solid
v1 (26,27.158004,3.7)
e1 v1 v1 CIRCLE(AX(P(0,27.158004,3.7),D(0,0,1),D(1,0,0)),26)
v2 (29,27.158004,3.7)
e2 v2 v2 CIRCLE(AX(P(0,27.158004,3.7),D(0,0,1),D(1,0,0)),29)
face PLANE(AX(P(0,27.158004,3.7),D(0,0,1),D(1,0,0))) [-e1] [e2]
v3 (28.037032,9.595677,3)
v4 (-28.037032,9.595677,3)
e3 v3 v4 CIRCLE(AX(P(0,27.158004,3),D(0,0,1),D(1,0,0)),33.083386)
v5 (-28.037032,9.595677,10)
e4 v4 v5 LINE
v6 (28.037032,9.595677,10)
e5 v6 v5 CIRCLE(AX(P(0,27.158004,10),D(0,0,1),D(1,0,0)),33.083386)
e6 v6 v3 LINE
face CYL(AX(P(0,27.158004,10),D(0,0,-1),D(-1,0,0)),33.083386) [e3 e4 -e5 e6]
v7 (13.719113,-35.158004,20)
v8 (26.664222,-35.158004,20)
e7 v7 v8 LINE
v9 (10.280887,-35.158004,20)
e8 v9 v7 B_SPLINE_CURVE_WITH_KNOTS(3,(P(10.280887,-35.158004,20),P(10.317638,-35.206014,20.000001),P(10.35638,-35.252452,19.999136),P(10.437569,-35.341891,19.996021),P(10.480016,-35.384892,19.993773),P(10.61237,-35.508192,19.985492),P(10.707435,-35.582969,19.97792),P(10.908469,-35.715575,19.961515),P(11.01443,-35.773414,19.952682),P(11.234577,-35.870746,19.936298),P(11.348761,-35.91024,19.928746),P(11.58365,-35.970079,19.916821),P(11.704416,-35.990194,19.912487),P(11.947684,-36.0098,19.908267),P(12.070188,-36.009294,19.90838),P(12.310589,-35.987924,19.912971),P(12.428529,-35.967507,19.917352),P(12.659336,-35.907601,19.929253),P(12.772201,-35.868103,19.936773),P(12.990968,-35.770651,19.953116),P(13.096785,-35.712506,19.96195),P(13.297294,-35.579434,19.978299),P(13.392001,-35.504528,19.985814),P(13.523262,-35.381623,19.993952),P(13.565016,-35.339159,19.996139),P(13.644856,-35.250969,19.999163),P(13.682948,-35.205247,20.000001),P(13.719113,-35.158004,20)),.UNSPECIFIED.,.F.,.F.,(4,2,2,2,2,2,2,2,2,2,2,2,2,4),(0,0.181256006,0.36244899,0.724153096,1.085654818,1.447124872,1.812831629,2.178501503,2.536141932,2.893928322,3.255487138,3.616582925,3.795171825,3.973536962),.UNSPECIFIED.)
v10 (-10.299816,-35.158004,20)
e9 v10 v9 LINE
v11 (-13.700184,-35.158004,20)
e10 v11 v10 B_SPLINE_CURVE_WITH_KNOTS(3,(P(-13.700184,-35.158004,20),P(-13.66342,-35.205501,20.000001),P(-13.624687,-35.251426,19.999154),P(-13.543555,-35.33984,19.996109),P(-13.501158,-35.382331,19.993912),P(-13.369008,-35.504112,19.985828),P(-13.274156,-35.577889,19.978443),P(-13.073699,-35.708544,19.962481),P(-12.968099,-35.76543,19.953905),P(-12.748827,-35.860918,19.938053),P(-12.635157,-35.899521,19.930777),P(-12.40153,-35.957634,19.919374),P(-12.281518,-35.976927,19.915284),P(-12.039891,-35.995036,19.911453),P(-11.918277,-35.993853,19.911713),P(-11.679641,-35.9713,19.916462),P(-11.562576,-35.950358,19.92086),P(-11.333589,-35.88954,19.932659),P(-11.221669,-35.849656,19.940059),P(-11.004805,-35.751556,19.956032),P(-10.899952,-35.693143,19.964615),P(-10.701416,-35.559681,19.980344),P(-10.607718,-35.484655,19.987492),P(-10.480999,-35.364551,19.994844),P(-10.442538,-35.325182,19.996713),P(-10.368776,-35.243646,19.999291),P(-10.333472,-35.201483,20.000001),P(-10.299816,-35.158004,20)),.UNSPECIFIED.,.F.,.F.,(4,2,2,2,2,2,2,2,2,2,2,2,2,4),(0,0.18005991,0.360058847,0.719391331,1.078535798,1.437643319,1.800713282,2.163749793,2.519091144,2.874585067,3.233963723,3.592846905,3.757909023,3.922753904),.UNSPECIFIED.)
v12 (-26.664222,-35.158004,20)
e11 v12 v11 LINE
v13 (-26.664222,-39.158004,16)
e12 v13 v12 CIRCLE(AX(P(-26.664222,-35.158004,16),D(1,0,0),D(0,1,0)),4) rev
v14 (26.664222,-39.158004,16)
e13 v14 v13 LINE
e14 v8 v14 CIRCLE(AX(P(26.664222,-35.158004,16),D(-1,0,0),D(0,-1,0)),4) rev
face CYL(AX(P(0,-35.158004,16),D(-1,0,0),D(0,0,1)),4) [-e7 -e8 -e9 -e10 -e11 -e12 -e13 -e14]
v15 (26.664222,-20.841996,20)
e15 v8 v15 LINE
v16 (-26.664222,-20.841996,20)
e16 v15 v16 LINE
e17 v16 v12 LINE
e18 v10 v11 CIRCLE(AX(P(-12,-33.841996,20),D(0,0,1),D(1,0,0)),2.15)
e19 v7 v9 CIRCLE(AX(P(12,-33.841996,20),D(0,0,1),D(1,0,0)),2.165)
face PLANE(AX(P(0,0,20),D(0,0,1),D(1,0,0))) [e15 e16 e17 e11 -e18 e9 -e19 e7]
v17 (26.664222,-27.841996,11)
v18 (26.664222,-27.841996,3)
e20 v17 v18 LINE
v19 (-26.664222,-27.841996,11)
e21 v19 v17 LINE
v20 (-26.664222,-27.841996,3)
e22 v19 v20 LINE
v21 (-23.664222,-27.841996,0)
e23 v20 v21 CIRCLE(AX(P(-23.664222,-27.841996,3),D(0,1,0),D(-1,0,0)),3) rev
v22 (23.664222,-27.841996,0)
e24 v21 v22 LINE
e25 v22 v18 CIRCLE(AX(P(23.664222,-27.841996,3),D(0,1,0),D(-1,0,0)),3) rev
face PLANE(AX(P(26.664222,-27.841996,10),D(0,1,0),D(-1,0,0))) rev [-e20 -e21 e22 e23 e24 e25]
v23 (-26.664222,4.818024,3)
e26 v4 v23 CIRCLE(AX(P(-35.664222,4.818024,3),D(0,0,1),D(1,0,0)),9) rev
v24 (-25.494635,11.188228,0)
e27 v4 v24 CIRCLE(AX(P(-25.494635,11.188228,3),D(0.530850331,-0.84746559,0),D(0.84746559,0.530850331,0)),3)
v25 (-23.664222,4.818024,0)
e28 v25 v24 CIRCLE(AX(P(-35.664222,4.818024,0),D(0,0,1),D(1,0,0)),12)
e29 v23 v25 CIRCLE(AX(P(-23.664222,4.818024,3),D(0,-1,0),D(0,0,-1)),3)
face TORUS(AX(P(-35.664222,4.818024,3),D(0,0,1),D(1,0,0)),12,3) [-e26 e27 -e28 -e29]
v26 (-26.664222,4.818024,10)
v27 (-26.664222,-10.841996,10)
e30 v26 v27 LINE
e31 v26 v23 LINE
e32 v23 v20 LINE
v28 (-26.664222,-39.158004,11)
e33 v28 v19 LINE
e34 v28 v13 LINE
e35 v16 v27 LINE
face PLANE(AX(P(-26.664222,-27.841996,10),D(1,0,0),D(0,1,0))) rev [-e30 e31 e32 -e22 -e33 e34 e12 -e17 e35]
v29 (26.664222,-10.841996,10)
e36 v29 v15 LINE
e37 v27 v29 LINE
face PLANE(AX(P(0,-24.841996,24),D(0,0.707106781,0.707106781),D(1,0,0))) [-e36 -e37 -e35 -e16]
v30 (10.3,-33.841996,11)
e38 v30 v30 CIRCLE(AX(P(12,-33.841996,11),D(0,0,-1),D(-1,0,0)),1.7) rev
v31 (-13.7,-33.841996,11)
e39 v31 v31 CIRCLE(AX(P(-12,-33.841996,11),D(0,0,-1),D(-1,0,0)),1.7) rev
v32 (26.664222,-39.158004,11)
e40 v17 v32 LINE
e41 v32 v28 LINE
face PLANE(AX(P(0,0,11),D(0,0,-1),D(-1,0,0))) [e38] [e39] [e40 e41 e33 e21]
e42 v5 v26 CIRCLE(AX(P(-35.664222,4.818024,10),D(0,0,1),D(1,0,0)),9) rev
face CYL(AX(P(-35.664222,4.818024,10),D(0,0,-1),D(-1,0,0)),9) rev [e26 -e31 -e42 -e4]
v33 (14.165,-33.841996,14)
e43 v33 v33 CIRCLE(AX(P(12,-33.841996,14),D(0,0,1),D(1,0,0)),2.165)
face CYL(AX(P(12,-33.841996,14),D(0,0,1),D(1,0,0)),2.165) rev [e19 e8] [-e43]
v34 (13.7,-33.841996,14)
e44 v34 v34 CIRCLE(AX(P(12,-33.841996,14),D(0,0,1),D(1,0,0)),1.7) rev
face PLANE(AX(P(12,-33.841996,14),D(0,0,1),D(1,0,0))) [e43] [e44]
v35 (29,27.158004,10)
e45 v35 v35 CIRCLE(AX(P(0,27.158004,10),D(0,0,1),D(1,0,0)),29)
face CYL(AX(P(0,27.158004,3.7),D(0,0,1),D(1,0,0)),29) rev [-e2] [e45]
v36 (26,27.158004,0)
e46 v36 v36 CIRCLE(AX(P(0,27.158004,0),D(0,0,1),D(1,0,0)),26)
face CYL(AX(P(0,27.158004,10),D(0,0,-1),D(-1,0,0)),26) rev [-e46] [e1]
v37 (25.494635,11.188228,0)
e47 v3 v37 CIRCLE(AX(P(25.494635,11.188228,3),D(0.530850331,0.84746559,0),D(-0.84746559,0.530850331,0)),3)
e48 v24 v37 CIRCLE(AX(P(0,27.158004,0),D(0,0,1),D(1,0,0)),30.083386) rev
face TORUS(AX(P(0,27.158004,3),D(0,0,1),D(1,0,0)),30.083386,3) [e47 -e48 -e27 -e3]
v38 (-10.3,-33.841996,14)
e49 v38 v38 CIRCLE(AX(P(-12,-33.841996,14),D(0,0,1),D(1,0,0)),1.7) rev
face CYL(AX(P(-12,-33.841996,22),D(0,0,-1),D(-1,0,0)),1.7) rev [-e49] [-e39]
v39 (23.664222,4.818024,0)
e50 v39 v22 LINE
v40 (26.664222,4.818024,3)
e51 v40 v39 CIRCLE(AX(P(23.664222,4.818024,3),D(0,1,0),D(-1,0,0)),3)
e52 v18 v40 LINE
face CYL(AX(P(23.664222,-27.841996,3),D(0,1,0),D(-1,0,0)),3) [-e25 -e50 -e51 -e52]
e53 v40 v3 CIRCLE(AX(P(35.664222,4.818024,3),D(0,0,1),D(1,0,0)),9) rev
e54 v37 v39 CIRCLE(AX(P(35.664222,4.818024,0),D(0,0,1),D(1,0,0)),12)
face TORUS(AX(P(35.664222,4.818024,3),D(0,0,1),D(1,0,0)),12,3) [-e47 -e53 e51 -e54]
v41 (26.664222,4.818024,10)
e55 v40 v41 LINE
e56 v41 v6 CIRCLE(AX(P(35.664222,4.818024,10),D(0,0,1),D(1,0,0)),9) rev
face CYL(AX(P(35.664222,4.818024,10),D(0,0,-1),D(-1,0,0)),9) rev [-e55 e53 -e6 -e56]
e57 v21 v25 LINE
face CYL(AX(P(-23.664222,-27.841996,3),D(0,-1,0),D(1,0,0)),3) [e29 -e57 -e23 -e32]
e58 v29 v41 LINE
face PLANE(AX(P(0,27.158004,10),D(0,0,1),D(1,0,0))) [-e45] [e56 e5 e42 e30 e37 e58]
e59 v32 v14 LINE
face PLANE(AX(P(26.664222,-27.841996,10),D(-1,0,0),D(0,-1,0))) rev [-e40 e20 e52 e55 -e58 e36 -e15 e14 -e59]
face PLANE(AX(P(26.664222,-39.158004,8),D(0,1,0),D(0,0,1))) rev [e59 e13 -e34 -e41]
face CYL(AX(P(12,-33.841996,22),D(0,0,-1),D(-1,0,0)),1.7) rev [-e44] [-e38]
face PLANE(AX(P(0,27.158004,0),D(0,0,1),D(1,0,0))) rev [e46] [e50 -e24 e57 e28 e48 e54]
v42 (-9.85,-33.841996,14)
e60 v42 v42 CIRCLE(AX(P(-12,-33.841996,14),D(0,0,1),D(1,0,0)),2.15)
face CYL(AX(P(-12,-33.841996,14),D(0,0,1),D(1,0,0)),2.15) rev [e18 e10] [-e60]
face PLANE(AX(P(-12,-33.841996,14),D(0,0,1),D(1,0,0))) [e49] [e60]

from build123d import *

# Parameters (mm, degrees)
SKETCH_1_R          = 26
EXTRUDE_1_DEPTH     = 10
SKETCH_3_R          = 29
CUT_EXTRUDE_1_DEPTH = 6.3
FILLET_1_R          = 9
SKETCH_4_W          = 53.328443722
SKETCH_4_H          = 11.316007496
EXTRUDE_2_DEPTH     = 10
SKETCH_5_W          = 53.328443722
SKETCH_5_H          = 11.316007496
EXTRUDE_3_DEPTH     = 2
SKETCH_6_W          = 53.328443722
SKETCH_6_H          = 10
EXTRUDE_4_DEPTH     = 3
CHAMFER_1_SIZE      = 14
FILLET_3_R          = 3
SKETCH_7_R          = 1.7
CUT_EXTRUDE_2_DEPTH = 14
SKETCH_8_R          = 2.15
SKETCH_8_R_2        = 2.165
CUT_EXTRUDE_3_DEPTH = 6
SKETCH_9_W          = 53.328443722
SKETCH_9_H          = 11.316007496
CUT_EXTRUDE_4_DEPTH = 3
FILLET_4_R          = 4


with BuildPart() as part:
    # 草图1 → 凸台-拉伸1 (new body)
    with BuildSketch(Plane.XY):
        with BuildLine():
            Line((26.664221861, -27.841996252), (-26.664221861, -27.841996252))
            Line((-26.664221861, -27.841996252), (-26.664221861, 7.574088737))
            ThreePointArc((-26.664221861, 7.574088737), (0, 60.241390131), (26.664221861, 7.574088737))
            Line((26.664221861, 7.574088737), (26.664221861, -27.841996252))
        make_face()
        with Locations((0, 27.158003748)):
            Circle(SKETCH_1_R, mode=Mode.SUBTRACT)
    extrude(amount=EXTRUDE_1_DEPTH)

    # 草图3 → 切除-拉伸1 (cut)
    with BuildSketch(Plane.XY.offset(10)):
        with Locations((0, 27.158003748)):
            Circle(SKETCH_3_R)
    extrude(amount=-CUT_EXTRUDE_1_DEPTH, mode=Mode.SUBTRACT)

    # 圆角1
    fillet_1_edges = [part.edges().sort_by_distance(p)[0] for p in [
        (-26.664221861, 7.574088737, 5),
        (26.664221861, 7.574088737, 5),
    ]]
    fillet(fillet_1_edges, radius=FILLET_1_R)



with BuildPart() as body_2:
    # 草图4 → 凸台-拉伸2 (new body)
    with BuildSketch(Plane.XY.offset(10)):
        with Locations((0, -33.5)):
            Rectangle(SKETCH_4_W, SKETCH_4_H)
    extrude(amount=EXTRUDE_2_DEPTH)


with BuildPart() as part_1:
    add(part.part)

    add(body_2.part)  # 凸台-拉伸3 merges body 2
    # 草图5 → 凸台-拉伸3 (add)
    with BuildSketch(Plane(origin=(0, 0, 10), x_dir=(-1, 0, 0), z_dir=(0, 0, -1))):
        with Locations((0, -33.5)):
            Rectangle(SKETCH_5_W, SKETCH_5_H)
    extrude(amount=EXTRUDE_3_DEPTH)

    # 草图6 → 凸台-拉伸4 (add)
    with BuildSketch(Plane(origin=(0, -27.841996252, 0), x_dir=(1, 0, 0), z_dir=(0, 1, 0))):
        with Locations((0, -15)):
            Rectangle(SKETCH_6_W, SKETCH_6_H)
    extrude(amount=EXTRUDE_4_DEPTH)

    # 倒角1
    # the kernel refuses this chamfer: 14 mm, written as the material it adds along each edge
    with BuildSketch(Plane(origin=(-26.664221861, -24.841996252, 10), x_dir=(0, -0.027495876610586365, 0.9996219169112968), z_dir=(1, 0, 0))) as chamfer_1_piece_1_section:
        Polygon((CHAMFER_1_SIZE * 0.999621916911, -CHAMFER_1_SIZE * 0.0274958766106), (-CHAMFER_1_SIZE * 0.0274958766106, -CHAMFER_1_SIZE * 0.999621916911), (0, 0), align=None)
    chamfer_1_piece_1 = extrude(amount=53.328443723, mode=Mode.PRIVATE)
    chamfer_1_piece_1 = split(chamfer_1_piece_1, bisect_by=Plane(origin=(0, -19.845516644, 20), z_dir=(0, 0, -1)), keep=Keep.TOP, mode=Mode.PRIVATE)
    add(chamfer_1_piece_1)

    # 圆角3
    fillet_3_edges = [part_1.edges().sort_by_distance(p)[0] for p in [
        (-26.664221861, -11.511986052, 0),
        (0, 60.241390131, 0),
        (-27.014230163, 7.303510743, 0),
        (27.014230163, 7.303510743, 0),
        (26.664221861, -11.511986052, 0),
    ]]
    fillet(fillet_3_edges, radius=FILLET_3_R)

    # 草图7 → 切除-拉伸2 (cut)
    with BuildSketch(Plane(origin=(0, 0, 8), x_dir=(-1, 0, 0), z_dir=(0, 0, -1))):
        with Locations((-12, -33.841996252)):
            Circle(SKETCH_7_R)
        with Locations((12, -33.841996252)):
            Circle(SKETCH_7_R)
    extrude(amount=-CUT_EXTRUDE_2_DEPTH, mode=Mode.SUBTRACT)

    # 草图8 → 切除-拉伸3 (cut)
    with BuildSketch(Plane.XY.offset(20)):
        with Locations((-12, -33.841996252)):
            Circle(SKETCH_8_R)
        with Locations((12, -33.841996252)):
            Circle(SKETCH_8_R_2)
    extrude(amount=-CUT_EXTRUDE_3_DEPTH, mode=Mode.SUBTRACT)

    # 草图9 → 切除-拉伸4 (cut)
    with BuildSketch(Plane(origin=(0, 0, 8), x_dir=(-1, 0, 0), z_dir=(0, 0, -1))):
        with Locations((0, -33.5)):
            Rectangle(SKETCH_9_W, SKETCH_9_H)
    extrude(amount=-CUT_EXTRUDE_4_DEPTH, mode=Mode.SUBTRACT)

    # 圆角4
    # the kernel refuses this fillet: 4 mm, written as the material it takes off along each edge
    with BuildSketch(Plane(origin=(36.664221861, -39.158003748, 20), x_dir=(0, 1, 0), z_dir=(-1, 0, 0))) as fillet_4_piece_1:
        with BuildLine():
            CenterArc((FILLET_4_R, FILLET_4_R), FILLET_4_R, 180, 90)
            Line((0, FILLET_4_R), (0, 0))
            Line((0, 0), (FILLET_4_R, 0))
        make_face()
    extrude(amount=73.328443723, mode=Mode.SUBTRACT)


solid = part_1.part
